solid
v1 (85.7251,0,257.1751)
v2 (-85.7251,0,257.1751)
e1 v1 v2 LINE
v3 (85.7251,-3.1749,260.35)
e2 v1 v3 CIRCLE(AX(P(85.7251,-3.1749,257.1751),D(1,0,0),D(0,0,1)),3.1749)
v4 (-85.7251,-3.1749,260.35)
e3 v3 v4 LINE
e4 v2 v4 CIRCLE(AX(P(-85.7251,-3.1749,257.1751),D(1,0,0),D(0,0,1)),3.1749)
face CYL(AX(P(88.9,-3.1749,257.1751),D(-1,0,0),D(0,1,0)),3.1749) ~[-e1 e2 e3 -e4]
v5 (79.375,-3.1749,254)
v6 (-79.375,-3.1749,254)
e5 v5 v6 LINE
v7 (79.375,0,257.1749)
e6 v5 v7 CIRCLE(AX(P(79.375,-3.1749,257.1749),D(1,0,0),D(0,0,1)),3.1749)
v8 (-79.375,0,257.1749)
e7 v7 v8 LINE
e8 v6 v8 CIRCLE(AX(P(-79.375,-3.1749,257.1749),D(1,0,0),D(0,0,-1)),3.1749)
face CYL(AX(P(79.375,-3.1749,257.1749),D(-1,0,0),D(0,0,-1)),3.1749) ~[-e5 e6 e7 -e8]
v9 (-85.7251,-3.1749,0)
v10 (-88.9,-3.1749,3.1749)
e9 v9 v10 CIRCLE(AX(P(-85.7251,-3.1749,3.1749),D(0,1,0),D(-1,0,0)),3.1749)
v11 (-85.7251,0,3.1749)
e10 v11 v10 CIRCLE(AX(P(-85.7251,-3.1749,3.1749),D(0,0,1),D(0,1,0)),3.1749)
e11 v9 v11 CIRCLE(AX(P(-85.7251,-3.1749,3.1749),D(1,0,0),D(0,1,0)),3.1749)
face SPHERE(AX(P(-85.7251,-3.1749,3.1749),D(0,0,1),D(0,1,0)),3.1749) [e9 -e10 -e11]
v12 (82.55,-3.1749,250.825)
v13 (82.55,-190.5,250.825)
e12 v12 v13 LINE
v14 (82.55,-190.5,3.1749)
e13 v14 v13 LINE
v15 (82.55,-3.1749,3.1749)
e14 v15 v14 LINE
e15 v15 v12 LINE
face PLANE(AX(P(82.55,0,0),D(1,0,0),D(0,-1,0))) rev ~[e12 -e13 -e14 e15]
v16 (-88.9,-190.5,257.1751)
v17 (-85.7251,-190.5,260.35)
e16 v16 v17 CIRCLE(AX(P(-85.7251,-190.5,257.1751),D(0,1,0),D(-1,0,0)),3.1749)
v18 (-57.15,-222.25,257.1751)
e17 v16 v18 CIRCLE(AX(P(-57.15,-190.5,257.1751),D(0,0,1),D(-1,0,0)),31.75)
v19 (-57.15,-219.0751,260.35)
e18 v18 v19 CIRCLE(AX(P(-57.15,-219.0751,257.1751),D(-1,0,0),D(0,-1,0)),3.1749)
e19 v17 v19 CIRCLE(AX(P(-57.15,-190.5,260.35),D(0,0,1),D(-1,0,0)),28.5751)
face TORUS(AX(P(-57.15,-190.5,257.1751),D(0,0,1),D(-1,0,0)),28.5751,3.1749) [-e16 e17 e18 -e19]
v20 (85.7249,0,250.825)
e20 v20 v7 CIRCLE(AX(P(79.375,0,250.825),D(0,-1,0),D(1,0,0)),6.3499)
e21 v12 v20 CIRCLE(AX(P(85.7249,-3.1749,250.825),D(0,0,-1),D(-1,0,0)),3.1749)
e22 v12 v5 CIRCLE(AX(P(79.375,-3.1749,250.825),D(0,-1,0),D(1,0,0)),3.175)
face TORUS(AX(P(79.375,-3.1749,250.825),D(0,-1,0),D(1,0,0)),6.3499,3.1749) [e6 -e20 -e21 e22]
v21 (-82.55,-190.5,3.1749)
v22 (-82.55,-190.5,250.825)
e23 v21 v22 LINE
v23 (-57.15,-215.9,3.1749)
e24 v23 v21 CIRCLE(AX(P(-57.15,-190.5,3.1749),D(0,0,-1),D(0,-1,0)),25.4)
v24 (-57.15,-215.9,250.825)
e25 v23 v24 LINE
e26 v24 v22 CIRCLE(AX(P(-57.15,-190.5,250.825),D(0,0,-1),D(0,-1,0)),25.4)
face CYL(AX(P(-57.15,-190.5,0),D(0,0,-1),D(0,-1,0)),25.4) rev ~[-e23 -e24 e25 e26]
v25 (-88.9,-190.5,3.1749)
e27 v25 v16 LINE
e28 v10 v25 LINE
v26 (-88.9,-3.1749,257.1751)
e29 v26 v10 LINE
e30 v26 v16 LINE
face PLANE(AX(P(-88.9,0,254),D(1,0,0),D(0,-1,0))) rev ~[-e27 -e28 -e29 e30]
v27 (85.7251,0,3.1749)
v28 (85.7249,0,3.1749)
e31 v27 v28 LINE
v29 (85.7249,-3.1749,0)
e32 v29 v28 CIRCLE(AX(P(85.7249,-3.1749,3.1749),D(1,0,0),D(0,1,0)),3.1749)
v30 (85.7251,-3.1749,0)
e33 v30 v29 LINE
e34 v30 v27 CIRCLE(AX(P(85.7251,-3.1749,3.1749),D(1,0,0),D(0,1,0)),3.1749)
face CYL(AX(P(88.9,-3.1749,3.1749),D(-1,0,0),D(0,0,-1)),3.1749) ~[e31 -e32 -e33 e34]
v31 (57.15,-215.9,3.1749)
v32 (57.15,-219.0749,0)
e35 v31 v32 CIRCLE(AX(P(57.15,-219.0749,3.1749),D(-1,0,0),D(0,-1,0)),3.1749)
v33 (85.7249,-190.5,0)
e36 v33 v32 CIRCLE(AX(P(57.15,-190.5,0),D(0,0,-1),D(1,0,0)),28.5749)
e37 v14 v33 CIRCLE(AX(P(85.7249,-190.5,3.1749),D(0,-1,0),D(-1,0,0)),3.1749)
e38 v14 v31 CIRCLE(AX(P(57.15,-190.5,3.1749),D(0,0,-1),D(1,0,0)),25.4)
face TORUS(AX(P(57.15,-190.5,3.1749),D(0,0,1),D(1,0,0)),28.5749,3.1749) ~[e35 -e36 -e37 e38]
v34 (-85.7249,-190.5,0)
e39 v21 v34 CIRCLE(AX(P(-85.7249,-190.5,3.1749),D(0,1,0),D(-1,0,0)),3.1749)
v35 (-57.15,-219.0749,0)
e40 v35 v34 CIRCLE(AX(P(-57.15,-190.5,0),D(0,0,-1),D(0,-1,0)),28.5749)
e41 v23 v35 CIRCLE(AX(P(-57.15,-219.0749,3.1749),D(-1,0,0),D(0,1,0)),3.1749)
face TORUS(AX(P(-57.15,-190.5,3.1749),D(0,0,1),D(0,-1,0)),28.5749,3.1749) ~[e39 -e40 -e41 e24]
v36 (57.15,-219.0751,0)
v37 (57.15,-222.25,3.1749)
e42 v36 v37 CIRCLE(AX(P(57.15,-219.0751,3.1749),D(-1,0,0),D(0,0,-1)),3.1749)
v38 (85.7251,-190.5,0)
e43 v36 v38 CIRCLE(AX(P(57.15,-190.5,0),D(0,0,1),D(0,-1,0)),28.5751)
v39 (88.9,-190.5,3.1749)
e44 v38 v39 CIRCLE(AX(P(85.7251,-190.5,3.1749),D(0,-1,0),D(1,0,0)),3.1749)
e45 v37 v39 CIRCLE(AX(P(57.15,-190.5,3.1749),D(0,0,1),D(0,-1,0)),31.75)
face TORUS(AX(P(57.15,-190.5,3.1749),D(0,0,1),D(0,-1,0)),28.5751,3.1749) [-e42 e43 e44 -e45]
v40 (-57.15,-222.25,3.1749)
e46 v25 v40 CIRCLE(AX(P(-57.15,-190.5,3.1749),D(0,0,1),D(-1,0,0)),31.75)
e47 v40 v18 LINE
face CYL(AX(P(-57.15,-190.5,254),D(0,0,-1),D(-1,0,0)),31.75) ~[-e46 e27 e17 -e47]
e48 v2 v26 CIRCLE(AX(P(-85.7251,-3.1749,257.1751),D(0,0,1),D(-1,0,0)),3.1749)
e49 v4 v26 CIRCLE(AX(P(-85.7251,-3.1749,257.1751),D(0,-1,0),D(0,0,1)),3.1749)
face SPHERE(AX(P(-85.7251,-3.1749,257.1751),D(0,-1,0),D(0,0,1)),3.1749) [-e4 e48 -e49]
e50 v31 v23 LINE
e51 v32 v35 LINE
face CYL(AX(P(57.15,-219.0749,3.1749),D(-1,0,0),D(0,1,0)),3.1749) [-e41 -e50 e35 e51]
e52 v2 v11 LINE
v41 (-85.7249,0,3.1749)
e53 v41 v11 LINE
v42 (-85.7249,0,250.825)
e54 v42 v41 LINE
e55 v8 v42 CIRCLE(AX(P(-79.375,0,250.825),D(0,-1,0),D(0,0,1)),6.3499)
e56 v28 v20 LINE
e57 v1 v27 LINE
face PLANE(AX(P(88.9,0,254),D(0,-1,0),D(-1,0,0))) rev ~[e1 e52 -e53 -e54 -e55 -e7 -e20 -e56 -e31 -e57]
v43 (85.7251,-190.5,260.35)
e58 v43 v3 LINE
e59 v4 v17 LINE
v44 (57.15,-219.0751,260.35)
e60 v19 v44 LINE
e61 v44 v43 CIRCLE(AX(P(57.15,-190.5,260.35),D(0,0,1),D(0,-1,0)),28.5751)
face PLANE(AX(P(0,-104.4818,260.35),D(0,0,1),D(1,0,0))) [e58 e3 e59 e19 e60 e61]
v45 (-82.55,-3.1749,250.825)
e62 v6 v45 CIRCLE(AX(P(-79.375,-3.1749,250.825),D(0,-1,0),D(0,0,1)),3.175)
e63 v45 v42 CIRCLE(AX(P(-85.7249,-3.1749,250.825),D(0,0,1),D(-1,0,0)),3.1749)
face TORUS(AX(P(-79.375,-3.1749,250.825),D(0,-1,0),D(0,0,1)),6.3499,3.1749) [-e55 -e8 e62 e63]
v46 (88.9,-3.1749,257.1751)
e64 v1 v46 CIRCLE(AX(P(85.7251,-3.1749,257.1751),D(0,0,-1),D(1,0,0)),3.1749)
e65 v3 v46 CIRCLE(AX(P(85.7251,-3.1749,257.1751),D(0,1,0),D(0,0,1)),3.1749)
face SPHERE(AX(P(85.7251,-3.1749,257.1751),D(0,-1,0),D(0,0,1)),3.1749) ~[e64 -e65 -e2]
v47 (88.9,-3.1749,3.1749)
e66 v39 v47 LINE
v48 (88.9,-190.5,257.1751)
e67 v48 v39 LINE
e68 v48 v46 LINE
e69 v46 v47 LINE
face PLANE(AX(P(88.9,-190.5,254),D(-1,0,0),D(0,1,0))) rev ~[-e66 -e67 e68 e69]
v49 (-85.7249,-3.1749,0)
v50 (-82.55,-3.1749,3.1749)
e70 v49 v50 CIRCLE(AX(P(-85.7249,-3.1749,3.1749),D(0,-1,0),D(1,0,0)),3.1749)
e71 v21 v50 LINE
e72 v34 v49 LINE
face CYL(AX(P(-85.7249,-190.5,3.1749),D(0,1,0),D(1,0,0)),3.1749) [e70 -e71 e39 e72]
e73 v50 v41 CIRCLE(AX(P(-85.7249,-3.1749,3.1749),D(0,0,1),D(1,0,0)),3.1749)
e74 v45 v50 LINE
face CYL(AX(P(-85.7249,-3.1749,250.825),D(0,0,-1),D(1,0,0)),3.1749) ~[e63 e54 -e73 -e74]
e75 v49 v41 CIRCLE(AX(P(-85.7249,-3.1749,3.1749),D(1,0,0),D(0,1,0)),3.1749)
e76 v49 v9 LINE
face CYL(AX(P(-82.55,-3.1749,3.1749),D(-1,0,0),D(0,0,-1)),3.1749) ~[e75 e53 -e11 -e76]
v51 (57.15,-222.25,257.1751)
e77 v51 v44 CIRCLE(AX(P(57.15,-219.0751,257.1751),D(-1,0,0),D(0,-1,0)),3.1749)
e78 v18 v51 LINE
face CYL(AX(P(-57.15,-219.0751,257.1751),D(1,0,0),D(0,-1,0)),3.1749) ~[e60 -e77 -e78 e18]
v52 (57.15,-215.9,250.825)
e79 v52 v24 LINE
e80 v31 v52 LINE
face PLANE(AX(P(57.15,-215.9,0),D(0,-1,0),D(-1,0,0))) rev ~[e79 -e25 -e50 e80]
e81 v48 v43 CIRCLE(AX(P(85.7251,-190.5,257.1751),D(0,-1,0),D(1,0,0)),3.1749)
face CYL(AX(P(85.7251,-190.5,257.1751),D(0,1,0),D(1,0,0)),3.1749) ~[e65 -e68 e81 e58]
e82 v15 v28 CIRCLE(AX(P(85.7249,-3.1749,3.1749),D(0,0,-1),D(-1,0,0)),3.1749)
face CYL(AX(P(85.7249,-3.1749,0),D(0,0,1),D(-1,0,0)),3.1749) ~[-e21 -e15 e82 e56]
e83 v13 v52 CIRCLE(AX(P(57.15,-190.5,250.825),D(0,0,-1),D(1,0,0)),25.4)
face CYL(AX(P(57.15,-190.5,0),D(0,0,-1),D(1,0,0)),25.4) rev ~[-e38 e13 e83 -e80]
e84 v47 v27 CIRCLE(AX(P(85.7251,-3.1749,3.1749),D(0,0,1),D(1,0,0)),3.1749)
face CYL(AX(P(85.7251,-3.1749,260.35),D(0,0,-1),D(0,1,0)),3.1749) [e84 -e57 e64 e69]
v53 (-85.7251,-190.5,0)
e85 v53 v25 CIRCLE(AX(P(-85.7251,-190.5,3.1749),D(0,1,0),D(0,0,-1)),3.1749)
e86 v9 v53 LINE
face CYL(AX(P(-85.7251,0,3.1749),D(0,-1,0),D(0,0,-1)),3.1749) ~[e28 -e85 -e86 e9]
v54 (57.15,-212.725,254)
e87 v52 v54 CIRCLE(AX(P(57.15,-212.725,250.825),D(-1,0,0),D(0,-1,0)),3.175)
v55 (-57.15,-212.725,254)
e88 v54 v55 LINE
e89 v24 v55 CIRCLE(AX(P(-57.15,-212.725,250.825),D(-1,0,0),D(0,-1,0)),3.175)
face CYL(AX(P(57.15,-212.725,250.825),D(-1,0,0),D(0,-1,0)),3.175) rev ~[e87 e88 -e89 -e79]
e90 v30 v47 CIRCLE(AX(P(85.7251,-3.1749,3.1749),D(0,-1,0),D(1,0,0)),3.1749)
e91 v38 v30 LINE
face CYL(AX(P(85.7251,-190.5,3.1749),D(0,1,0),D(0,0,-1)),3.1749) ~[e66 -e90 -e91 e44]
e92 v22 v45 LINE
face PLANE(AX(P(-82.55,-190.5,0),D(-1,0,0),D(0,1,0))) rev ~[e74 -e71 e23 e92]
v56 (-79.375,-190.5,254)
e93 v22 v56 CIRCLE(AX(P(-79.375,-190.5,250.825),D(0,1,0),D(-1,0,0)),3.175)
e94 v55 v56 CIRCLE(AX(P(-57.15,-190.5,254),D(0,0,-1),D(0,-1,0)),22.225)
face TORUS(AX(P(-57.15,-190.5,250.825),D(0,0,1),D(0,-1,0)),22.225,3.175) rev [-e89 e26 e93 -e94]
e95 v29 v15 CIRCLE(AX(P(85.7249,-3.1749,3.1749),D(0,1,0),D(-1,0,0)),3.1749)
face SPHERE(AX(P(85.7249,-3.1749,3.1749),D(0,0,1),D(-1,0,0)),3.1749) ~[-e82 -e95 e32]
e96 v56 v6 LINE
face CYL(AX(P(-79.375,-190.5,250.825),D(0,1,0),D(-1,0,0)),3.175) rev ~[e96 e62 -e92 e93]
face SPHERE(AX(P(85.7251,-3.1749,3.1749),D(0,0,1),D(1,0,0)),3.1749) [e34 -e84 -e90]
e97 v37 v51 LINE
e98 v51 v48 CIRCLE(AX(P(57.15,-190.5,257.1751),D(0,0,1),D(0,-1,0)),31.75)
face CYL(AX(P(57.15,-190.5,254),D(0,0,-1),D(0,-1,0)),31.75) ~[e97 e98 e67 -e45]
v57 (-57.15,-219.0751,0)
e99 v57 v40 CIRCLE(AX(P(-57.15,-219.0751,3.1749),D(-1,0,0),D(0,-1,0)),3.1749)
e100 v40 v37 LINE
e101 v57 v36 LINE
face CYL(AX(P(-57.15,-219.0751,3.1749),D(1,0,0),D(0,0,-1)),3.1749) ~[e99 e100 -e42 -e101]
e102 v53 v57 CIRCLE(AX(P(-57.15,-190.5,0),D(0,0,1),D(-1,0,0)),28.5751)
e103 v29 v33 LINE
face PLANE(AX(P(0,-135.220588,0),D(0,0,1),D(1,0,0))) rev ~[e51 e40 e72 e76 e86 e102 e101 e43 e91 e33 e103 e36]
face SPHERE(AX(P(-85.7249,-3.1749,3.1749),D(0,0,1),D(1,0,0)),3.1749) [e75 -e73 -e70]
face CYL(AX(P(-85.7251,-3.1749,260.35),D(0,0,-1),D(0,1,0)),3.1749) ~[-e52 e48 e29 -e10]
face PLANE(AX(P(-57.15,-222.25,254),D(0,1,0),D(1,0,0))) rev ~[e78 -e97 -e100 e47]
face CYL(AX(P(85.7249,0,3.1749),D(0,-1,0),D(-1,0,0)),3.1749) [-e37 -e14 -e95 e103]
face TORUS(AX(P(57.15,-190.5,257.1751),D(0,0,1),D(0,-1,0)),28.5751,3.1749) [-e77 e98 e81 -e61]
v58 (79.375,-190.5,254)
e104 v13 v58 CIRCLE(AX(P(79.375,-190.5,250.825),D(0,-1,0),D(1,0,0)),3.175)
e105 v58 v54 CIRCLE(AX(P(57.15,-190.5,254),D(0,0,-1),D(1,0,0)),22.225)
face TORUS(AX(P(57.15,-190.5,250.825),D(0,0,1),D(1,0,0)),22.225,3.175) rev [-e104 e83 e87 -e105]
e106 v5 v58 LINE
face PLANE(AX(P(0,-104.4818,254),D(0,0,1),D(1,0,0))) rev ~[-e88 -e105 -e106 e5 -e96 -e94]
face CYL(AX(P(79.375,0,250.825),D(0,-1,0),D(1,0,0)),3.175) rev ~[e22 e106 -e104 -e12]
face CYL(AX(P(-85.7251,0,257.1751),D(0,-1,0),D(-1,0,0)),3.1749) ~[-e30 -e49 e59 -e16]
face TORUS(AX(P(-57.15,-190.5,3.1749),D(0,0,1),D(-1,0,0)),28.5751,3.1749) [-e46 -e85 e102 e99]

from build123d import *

# Parameters (mm, degrees)
F1_DEPTH = 254
F3_DEPTH = 6.35
F4_F1_R  = 3.175
F4_F2_R  = 3.1749


# Not quite as in the source:
# - a fillet or chamfer is up to 0.001 mm smaller than in the source, because OpenCascade refuses the exact size


with BuildPart() as f1:
    # F0 (on Top) → F1 (new body)
    with BuildSketch(Plane.XY):
        with BuildLine():
            Line((57.15, -215.9), (-57.15, -215.9))
            ThreePointArc((-57.15, -215.9), (-75.1105122421, -208.4605122421), (-82.55, -190.5))
            Line((-82.55, -190.5), (-82.55, 0))
            Line((-82.55, 0), (-88.9, 0))
            Line((-88.9, 0), (-88.9, -190.5))
            ThreePointArc((-88.9, -190.5), (-79.6006403027, -212.9506403027), (-57.15, -222.25))
            Line((-57.15, -222.25), (57.15, -222.25))
            ThreePointArc((57.15, -222.25), (79.6006403027, -212.9506403027), (88.9, -190.5))
            Line((88.9, -190.5), (88.9, 0))
            Line((88.9, 0), (82.55, 0))
            Line((82.55, 0), (82.55, -190.5))
            ThreePointArc((82.55, -190.5), (75.1105122421, -208.4605122421), (57.15, -215.9))
        make_face()
    extrude(amount=F1_DEPTH)

    # F2 (on face) → F3 (join)
    with BuildSketch(Plane.XY.offset(254)):
        with BuildLine():
            Line((82.55, 0), (-82.55, 0))
            Line((-82.55, 0), (-82.55, -190.5))
            ThreePointArc((-82.55, -190.5), (-75.1105122421, -208.4605122421), (-57.15, -215.9))
            Line((-57.15, -215.9), (57.15, -215.9))
            ThreePointArc((57.15, -215.9), (75.1105122421, -208.4605122421), (82.55, -190.5))
            Line((82.55, -190.5), (82.55, 0))
        make_face()
        with BuildLine():
            Line((-82.55, 0), (-88.9, 0))
            Line((-88.9, 0), (-88.9, -190.5))
            ThreePointArc((-88.9, -190.5), (-79.6006403027, -212.9506403027), (-57.15, -222.25))
            Line((-57.15, -222.25), (57.15, -222.25))
            ThreePointArc((57.15, -222.25), (79.6006403027, -212.9506403027), (88.9, -190.5))
            Line((88.9, -190.5), (88.9, 0))
            Line((88.9, 0), (82.55, 0))
            Line((82.55, 0), (82.55, -190.5))
            ThreePointArc((82.55, -190.5), (75.1105122421, -208.4605122421), (57.15, -215.9))
            Line((57.15, -215.9), (-57.15, -215.9))
            ThreePointArc((-57.15, -215.9), (-75.1105122421, -208.4605122421), (-82.55, -190.5))
            Line((-82.55, -190.5), (-82.55, 0))
        make_face()
    extrude(amount=F3_DEPTH)

    # F4: fillet of radius 3.175 on 23 edges, made by hand

    # F4_f1
    f4_f1_edges = [f1.edges().sort_by_distance(p)[0] for p in [
        (75.1105122421, -208.4605122421, 254),
        (82.55, -95.25, 254),
        (0, -215.9, 254),
        (-75.1105122421, -208.4605122421, 254),
        (-82.55, -95.25, 254),
    ]]
    fillet(f4_f1_edges, radius=F4_F1_R)

    # F4_f2 (radius 3.175 in the source; OpenCascade refuses exactly that, so slightly less here)
    f4_f2_edges = [f1.edges().sort_by_distance(p)[0] for p in [
        (-88.9, -95.25, 260.35),
        (-79.6006403027, -212.9506403027, 260.35),
        (0, -222.25, 260.35),
        (79.6006403027, -212.9506403027, 260.35),
        (88.9, -95.25, 260.35),
        (0, 0, 260.35),
        (88.9, 0, 130.175),
        (-88.9, 0, 130.175),
        (82.55, 0, 125.4125),
        (-82.55, 0, 125.4125),
        (75.1105122421, -208.4605122421, 0),
        (0, -215.9, 0),
        (-75.1105122421, -208.4605122421, 0),
        (-82.55, -95.25, 0),
        (-85.725, 0, 0),
        (-88.9, -95.25, 0),
        (-79.6006403027, -212.9506403027, 0),
        (0, -222.25, 0),
        (79.6006403027, -212.9506403027, 0),
        (88.9, -95.25, 0),
        (85.725, 0, 0),
        (82.55, -95.25, 0),
        (-81.6200640303, 0, 253.0700640303),
        (81.6200640303, 0, 253.0700640303),
    ]]
    fillet(f4_f2_edges, radius=F4_F2_R)


solid = f1.part
